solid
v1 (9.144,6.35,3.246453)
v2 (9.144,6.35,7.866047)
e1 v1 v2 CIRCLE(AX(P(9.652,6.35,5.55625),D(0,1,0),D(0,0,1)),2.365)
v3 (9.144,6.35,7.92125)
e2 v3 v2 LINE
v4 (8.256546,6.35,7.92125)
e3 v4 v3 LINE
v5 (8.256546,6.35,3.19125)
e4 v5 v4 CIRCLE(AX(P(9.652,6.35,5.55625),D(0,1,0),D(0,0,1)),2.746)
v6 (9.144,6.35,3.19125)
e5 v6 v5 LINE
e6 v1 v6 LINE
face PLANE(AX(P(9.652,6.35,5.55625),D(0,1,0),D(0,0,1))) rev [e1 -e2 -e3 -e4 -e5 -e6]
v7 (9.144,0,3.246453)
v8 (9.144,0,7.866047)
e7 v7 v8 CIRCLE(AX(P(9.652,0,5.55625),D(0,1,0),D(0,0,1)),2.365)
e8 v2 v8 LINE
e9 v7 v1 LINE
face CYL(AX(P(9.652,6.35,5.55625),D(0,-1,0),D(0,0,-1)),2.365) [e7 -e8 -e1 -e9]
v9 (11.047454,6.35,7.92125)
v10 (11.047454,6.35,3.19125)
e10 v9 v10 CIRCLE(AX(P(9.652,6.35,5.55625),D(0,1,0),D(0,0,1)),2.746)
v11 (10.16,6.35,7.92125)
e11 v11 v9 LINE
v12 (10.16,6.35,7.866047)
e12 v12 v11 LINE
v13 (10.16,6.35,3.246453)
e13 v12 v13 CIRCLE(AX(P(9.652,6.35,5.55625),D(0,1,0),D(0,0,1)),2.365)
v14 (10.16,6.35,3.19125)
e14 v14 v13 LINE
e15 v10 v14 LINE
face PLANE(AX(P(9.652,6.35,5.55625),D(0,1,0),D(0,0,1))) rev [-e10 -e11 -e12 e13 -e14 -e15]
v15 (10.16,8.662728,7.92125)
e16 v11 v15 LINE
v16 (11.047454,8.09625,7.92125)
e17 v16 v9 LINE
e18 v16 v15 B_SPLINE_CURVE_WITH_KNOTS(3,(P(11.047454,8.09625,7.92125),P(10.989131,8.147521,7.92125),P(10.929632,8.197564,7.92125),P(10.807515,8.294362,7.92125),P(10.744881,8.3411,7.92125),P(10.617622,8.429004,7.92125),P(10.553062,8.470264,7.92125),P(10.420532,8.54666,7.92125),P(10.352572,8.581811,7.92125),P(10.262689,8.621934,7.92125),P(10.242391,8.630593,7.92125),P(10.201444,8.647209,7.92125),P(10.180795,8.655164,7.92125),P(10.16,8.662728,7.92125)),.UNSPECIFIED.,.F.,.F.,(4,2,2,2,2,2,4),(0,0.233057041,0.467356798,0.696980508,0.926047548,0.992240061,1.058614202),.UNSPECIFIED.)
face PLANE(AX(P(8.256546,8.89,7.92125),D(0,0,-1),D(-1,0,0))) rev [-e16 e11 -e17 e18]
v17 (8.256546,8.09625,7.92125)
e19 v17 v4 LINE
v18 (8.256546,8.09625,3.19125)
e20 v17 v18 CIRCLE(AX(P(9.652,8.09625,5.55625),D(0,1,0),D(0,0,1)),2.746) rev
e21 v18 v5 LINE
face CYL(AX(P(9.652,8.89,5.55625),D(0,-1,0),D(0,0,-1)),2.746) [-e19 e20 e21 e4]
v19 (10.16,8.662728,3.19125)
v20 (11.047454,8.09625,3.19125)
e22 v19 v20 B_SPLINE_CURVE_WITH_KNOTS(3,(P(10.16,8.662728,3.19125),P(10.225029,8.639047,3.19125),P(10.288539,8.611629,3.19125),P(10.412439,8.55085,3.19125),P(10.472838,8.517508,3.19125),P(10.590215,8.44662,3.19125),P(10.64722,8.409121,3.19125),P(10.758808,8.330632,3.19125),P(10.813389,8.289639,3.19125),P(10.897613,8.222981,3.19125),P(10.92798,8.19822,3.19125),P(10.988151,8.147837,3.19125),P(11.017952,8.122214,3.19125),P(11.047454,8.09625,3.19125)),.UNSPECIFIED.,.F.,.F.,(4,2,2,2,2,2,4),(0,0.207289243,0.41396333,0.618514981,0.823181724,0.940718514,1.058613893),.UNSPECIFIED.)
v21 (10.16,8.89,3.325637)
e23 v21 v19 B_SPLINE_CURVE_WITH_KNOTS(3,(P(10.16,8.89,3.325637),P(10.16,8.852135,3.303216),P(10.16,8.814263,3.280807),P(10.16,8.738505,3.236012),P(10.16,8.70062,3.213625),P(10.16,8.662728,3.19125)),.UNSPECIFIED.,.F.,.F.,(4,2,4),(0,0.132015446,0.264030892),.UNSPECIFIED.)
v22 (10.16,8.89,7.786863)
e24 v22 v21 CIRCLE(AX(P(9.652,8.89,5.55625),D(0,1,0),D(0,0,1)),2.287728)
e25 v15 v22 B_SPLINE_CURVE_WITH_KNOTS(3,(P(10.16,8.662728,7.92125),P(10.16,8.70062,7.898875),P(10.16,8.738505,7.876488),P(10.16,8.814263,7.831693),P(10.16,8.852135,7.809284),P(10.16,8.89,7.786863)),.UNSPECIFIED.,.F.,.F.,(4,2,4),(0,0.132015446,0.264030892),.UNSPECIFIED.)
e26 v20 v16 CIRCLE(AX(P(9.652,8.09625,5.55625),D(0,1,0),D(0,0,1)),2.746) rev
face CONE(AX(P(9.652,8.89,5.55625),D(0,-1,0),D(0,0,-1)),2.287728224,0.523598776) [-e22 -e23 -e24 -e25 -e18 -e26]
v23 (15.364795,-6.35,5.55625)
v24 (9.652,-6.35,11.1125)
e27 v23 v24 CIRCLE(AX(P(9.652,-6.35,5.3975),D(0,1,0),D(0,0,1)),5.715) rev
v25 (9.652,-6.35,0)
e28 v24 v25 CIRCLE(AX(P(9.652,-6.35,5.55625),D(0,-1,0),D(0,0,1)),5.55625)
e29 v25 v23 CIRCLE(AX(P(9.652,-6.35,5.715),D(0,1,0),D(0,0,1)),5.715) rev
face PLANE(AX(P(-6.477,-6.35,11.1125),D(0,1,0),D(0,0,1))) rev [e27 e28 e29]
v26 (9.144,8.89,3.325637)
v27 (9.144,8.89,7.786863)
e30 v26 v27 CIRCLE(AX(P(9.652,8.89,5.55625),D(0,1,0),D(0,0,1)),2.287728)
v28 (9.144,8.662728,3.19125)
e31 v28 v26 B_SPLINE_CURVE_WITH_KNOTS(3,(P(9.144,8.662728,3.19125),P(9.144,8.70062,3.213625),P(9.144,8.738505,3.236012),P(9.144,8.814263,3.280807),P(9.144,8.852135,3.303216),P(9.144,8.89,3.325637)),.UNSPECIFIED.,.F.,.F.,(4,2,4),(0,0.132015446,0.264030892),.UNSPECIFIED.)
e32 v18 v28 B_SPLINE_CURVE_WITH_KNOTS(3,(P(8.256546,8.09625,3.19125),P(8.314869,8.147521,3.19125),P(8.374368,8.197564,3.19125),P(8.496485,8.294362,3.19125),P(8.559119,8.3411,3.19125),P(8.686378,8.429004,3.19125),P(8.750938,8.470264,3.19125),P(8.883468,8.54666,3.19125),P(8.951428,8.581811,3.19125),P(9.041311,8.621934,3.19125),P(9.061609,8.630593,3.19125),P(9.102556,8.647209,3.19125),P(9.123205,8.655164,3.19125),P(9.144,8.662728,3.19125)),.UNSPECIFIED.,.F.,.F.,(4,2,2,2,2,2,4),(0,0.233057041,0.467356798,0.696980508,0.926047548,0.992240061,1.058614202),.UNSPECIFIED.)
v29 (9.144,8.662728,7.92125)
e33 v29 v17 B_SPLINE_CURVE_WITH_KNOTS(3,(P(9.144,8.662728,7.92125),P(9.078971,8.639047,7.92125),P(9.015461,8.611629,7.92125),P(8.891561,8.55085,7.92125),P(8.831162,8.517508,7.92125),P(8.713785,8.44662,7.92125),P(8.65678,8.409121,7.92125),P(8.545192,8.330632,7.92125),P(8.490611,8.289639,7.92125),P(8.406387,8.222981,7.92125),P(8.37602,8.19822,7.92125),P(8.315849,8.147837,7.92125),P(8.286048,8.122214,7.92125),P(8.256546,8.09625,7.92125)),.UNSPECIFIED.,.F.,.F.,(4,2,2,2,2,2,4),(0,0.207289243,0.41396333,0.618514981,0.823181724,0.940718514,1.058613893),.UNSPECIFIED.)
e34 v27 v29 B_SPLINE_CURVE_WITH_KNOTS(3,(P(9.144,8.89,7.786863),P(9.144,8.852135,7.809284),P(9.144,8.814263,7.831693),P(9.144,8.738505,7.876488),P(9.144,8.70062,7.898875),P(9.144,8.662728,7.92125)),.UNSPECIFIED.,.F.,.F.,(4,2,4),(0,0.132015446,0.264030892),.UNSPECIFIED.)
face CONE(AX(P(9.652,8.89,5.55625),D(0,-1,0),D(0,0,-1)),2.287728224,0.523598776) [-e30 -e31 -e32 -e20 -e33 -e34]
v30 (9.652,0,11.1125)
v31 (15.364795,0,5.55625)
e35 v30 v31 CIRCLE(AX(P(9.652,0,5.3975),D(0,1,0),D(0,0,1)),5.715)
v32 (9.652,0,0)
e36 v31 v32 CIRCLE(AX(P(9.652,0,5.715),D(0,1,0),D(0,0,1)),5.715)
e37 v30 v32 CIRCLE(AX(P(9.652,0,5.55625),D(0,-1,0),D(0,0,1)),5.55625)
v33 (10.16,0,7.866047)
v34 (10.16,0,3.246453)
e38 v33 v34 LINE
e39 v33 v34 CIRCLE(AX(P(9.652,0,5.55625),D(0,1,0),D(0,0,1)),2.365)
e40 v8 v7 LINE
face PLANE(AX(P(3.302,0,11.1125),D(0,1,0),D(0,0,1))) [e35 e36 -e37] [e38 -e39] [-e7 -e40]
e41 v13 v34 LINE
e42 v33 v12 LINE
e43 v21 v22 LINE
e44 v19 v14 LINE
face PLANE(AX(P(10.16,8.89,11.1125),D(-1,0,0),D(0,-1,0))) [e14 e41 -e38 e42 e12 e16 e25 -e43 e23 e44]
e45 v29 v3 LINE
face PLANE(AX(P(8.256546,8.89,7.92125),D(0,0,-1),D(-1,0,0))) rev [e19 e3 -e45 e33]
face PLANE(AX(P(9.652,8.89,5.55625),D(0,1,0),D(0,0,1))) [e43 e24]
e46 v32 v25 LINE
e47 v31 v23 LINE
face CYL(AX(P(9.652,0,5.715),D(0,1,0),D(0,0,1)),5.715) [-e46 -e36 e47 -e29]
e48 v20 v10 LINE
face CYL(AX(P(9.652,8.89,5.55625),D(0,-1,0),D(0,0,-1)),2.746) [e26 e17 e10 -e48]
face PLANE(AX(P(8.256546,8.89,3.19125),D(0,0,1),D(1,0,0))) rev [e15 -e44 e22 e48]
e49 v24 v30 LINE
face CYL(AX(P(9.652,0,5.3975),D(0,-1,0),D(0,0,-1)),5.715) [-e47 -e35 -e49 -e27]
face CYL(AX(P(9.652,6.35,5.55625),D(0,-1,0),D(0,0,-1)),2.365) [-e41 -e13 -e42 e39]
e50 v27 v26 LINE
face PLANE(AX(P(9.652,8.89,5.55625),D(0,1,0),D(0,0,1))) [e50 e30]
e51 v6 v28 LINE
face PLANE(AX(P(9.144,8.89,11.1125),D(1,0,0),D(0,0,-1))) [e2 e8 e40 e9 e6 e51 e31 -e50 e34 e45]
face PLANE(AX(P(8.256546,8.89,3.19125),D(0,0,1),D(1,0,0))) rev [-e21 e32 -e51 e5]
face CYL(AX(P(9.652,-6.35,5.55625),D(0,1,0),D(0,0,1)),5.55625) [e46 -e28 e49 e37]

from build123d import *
from OCP.BRepFilletAPI import BRepFilletAPI_MakeChamfer

# Parameters (mm, degrees)
BOSS_EXTRUDE1_DEPTH = 11.1125
FILLET1_R           = 6.35
FILLET2_R           = 5.715
SKETCH2_R           = 2.365
BOSS_EXTRUDE2_DEPTH = 6.35
BOSS_EXTRUDE3_DEPTH = 2.54
SKETCH4_W           = 1.016
SKETCH4_H           = 8.89
CUT_EXTRUDE2_DEPTH  = 21.94269975
CHAMFER1_SIZE       = 0.79375
CHAMFER1_SIZE2      = 0.458271776
CUT_EXTRUDE3_DEPTH  = 21.94269975


# Some blends are built 0.0001 mm under size
with BuildPart() as part:
    # Sketch1 → Boss-Extrude1 (new body)
    with BuildSketch(Plane.XY):
        with BuildLine():
            Line((3.302, 0), (15.367, 0))
            Line((15.367, 0), (15.367, -6.35))
            Line((15.367, -6.35), (-6.477, -6.35))
            Line((-6.477, -6.35), (-6.477, 0))
            Line((-6.477, 0), (-3.302, 0))
            ThreePointArc((-3.302, 0), (0, -3.302), (3.302, 0))
        make_face()
    extrude(amount=BOSS_EXTRUDE1_DEPTH)

    # Fillet1
    fillet1_edges = [part.edges().sort_by_distance(p)[0] for p in [
        (-6.477, -6.35, 5.55625),
    ]]
    fillet(fillet1_edges, radius=FILLET1_R - 0.0001)  # a hair under: the kernel refuses the full size

    # Fillet2
    # the kernel refuses this fillet: 5.715 mm, written as the material it takes off along each edge
    with BuildSketch(Plane(origin=(15.367, 14.2875, 0), x_dir=(-1, 0, 0), z_dir=(0, -1, 0)), Plane(origin=(15.367, 14.2875, 11.1125), x_dir=(0, 0, -1), z_dir=(0, -1, 0))) as fillet2_piece_1:
        with BuildLine():
            CenterArc((FILLET2_R, -FILLET2_R), FILLET2_R, 90, 90)
            Line((0, -FILLET2_R), (0, 0))
            Line((0, 0), (FILLET2_R, 0))
        make_face()
    extrude(amount=34.925, mode=Mode.SUBTRACT)

    # Sketch2 → Boss-Extrude2 (add)
    with BuildSketch(Plane(origin=(0, 0, 0), x_dir=(1, 0, 0), z_dir=(0, 1, 0))):
        with Locations(Location((9.652, -5.55625, 0), (0, 0, 270))):
            Circle(SKETCH2_R)
    extrude(amount=BOSS_EXTRUDE2_DEPTH)

    # Sketch3 → Boss-Extrude3 (add)
    with BuildSketch(Plane(origin=(0, 6.35, 0), x_dir=(1, 0, 0), z_dir=(0, 1, 0))):
        with BuildLine():
            Line((8.25654631, -7.92125), (11.04745369, -7.92125))
            ThreePointArc((11.04745369, -7.92125), (12.398, -5.55625), (11.04745369, -3.19125))
            Line((11.04745369, -3.19125), (8.25654631, -3.19125))
            ThreePointArc((8.25654631, -3.19125), (6.906, -5.55625), (8.25654631, -7.92125))
        make_face()
    extrude(amount=BOSS_EXTRUDE3_DEPTH)

    # Sketch4 → Cut-Extrude2 (cut, through all)
    with BuildSketch(Plane.XY):
        with Locations((9.652, 4.445)):
            Rectangle(SKETCH4_W, SKETCH4_H)
    extrude(amount=CUT_EXTRUDE2_DEPTH, mode=Mode.SUBTRACT)

    # Chamfer1: one chamfer whose edges measure the first distance from different faces: ONE call of the kernel's chamfer builder (chamfer() names one face for all edges)
    chamfer1_edges_1 = [part.edges().sort_by_distance(p)[0] for p in [
        (6.906, 8.89, 5.55625),
    ]]
    chamfer1_side_1 = [part.faces().sort_by_distance(p)[0] for p in [
        (6.906, 7.62, 5.55625),
    ]]
    chamfer1_edges_2 = [part.edges().sort_by_distance(p)[0] for p in [
        (12.398, 8.89, 5.55625),
    ]]
    chamfer1_side_2 = [part.faces().sort_by_distance(p)[0] for p in [
        (12.398, 7.62, 5.55625),
    ]]
    chamfer1 = BRepFilletAPI_MakeChamfer(part.part.solid().wrapped)
    for e in chamfer1_edges_1:
        chamfer1.Add(CHAMFER1_SIZE, CHAMFER1_SIZE2, e.wrapped, chamfer1_side_1[0].wrapped)  # the first distance lies on this face
    for e in chamfer1_edges_2:
        chamfer1.Add(CHAMFER1_SIZE, CHAMFER1_SIZE2, e.wrapped, chamfer1_side_2[0].wrapped)  # the first distance lies on this face
    add(Compound.cast(chamfer1.Shape()), mode=Mode.REPLACE)

    # Sketch5 → Cut-Extrude3 (cut, through all)
    with BuildSketch(Plane(origin=(0, 0, 0), x_dir=(1, 0, 0), z_dir=(0, 1, 0))):
        with BuildLine():
            Line((9.652, 0), (-6.477, 0))
            Line((-6.477, 0), (-6.477, -11.1125))
            Line((-6.477, -11.1125), (9.652, -11.1125))
            ThreePointArc((9.652, -11.1125), (4.09575, -5.55625), (9.652, 0))
        make_face()
    extrude(amount=-CUT_EXTRUDE3_DEPTH, mode=Mode.SUBTRACT)


solid = part.part
